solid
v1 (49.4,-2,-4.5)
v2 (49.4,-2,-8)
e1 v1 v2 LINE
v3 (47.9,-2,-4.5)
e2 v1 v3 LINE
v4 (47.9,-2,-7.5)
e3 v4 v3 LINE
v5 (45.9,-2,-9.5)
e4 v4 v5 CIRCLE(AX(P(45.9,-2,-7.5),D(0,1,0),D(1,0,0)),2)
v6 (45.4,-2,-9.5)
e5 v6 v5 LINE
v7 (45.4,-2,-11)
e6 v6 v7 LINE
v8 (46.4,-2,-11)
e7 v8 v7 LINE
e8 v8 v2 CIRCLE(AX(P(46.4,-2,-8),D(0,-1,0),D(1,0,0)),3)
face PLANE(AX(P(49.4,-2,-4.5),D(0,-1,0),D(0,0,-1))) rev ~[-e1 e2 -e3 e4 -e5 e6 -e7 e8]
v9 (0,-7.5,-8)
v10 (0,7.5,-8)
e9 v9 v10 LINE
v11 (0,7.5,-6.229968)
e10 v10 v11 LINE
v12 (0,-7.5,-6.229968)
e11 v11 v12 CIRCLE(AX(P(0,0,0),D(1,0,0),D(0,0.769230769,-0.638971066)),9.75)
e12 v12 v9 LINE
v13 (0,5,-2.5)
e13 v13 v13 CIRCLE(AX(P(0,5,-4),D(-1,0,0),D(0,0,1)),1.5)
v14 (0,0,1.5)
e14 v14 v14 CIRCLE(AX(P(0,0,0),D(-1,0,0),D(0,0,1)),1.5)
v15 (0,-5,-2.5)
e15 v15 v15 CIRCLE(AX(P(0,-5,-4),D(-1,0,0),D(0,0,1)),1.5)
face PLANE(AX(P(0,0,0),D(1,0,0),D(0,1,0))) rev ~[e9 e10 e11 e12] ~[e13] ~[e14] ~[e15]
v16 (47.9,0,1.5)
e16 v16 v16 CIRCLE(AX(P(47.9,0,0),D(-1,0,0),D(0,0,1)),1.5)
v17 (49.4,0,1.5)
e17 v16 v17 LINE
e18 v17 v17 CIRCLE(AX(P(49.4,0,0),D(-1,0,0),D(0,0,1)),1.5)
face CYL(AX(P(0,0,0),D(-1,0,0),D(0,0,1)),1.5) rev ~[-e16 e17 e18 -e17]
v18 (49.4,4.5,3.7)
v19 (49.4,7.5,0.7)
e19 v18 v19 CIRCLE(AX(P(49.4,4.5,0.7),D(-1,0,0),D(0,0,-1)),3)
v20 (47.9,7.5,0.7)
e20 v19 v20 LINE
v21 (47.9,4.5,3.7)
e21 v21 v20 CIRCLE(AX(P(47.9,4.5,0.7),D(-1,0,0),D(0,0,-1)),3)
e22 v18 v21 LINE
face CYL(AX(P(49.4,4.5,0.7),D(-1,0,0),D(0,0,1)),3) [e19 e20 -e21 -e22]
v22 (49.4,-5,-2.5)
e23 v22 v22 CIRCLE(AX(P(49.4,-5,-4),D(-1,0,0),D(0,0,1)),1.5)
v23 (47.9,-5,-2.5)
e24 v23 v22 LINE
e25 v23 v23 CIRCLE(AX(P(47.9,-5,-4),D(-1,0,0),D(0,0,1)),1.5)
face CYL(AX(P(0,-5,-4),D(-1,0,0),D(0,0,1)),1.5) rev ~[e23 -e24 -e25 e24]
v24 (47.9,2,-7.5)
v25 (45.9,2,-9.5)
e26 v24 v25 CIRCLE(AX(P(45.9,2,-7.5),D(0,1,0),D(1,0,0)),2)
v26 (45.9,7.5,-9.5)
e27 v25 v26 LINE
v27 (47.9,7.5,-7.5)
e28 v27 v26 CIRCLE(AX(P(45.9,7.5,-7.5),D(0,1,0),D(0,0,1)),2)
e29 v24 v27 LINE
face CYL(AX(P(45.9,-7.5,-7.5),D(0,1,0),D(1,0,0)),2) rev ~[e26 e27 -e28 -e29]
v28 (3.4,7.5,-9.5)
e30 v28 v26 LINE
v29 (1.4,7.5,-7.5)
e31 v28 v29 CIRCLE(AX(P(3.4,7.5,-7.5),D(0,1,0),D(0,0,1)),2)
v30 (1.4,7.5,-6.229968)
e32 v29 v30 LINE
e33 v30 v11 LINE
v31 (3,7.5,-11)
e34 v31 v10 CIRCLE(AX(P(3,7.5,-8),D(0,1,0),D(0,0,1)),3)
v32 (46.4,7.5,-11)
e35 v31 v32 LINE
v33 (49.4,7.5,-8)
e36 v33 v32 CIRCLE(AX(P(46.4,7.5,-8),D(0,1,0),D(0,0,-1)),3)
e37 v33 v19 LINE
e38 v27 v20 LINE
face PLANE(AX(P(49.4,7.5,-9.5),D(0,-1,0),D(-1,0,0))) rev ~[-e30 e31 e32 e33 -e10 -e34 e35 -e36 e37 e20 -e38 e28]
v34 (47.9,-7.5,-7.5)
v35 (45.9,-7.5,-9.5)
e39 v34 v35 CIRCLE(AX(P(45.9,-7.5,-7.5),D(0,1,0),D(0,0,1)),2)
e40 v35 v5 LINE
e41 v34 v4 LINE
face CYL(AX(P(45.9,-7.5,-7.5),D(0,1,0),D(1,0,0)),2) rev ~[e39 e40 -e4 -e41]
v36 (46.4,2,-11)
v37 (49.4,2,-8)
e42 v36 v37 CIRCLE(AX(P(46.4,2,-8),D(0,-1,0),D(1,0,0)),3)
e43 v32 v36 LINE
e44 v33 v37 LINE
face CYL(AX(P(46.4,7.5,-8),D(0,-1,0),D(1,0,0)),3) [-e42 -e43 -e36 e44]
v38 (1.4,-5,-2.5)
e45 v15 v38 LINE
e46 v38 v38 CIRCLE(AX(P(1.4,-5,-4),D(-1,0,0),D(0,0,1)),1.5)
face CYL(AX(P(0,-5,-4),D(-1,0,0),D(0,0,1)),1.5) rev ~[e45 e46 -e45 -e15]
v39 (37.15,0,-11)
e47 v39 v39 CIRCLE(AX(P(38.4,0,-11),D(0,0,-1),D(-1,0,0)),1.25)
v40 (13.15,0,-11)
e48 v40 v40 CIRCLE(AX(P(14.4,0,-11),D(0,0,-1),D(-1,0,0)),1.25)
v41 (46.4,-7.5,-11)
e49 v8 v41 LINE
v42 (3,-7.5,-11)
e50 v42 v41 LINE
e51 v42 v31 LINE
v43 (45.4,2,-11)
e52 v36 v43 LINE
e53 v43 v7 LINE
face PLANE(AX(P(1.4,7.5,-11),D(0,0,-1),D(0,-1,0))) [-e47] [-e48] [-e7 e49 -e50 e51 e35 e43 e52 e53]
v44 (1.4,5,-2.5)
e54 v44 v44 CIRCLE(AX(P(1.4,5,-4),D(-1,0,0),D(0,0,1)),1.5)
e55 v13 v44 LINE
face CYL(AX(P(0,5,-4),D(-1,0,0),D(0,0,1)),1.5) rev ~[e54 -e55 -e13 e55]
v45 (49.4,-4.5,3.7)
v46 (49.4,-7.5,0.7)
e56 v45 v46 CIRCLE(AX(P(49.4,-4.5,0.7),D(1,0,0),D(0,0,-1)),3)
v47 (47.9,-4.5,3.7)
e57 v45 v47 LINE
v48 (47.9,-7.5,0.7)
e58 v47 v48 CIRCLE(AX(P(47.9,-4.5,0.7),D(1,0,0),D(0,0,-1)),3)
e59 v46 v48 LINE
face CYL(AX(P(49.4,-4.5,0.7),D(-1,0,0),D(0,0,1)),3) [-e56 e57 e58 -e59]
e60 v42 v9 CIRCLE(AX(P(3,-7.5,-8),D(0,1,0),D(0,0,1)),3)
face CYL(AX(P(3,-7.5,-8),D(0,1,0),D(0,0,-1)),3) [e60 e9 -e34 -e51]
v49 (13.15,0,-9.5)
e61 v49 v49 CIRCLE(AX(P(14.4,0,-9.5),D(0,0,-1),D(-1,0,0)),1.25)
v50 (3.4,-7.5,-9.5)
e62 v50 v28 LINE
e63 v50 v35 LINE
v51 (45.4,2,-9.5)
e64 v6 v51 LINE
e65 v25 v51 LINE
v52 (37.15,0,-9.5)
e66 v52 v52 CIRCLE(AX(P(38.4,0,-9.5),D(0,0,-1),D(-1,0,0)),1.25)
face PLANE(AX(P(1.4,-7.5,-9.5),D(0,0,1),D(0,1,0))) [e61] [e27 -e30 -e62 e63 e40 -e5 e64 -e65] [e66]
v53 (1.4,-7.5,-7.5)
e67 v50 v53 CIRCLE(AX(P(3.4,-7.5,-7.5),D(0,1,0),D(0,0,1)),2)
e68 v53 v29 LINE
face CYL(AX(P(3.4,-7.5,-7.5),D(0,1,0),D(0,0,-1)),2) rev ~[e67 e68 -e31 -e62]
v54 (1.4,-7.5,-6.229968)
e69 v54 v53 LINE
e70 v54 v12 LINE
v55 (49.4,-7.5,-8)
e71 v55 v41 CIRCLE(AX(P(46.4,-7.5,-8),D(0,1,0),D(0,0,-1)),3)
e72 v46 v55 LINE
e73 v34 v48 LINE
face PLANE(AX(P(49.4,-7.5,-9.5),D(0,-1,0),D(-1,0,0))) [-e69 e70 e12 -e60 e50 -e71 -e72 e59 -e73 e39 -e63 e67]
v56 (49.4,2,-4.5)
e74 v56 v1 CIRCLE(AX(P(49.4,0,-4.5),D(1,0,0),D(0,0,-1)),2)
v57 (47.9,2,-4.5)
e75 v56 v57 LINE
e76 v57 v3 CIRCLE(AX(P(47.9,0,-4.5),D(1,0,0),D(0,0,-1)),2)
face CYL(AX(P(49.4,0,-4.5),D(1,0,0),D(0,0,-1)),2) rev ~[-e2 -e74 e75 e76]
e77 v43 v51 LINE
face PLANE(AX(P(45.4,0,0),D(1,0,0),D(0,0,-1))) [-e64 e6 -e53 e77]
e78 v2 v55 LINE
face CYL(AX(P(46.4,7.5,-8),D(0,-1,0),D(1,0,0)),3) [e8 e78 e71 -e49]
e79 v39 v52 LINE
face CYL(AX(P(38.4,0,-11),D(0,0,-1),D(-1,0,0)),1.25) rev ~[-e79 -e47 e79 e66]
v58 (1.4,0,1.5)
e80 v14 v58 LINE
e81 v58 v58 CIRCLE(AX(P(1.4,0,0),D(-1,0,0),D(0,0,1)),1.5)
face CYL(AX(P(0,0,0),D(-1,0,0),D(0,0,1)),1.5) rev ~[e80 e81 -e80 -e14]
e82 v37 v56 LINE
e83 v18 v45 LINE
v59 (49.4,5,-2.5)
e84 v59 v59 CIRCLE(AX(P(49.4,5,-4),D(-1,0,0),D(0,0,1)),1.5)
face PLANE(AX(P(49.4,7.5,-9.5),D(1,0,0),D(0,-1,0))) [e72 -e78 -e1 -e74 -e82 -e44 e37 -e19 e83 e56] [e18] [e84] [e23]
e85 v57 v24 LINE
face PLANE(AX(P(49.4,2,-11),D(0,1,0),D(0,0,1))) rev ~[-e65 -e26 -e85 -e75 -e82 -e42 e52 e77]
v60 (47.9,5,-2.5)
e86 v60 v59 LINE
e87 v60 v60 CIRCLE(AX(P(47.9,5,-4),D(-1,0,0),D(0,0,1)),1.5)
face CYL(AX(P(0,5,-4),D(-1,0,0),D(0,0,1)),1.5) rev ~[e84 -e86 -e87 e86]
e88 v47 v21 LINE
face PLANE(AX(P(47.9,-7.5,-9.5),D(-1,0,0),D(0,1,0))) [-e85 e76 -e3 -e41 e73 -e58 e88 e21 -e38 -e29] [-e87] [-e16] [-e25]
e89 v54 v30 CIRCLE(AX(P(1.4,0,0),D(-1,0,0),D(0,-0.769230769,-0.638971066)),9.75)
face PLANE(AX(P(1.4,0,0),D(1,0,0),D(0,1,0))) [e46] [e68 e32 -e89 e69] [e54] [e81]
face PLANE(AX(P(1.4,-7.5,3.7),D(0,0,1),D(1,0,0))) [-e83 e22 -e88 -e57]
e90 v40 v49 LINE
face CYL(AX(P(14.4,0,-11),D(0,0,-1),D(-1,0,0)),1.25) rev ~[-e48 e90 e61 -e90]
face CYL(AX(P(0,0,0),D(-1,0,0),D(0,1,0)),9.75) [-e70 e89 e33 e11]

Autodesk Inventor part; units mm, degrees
ref_plane "YZ Plane" through (0, 0, 0) normal (1, 0, 0) x (0, 1, 0)
ref_plane "XZ Plane" through (0, 0, 0) normal (0, 1, 0) x (-1, 0, 0)
ref_plane "XY Plane" through (0, 0, 0) normal (0, 0, 1) x (1, 0, 0)
sketch "スケッチ1" plane through (0, 0, 0) normal (1, 0, 0) x (0, 1, 0)
  circle A0 centre (0, 0) radius 9.75
  dimension "d0" = 19.5
extrude "押し出し1" add sketch "スケッチ1" along normal blind 1.4
sketch "スケッチ2" plane through (1.4, 0, 0) normal (1, 0, 0) x (0, 0, -1)
  circle A0 centre (0, 0) radius 9.75 projected
  line L0 (0, 0) -> (0, -7.5)
  line L1 (0, -7.5) -> (11, -7.5)
  line L2 (11, -7.5) -> (11, 7.5)
  line L3 (11, 7.5) -> (0, 7.5)
  line L4 (0, 7.5) -> (0, 0)
  point P0 (6.23, 7.5)
  point P1 (6.23, -7.5)
  dimension "d3" = 7.5
  dimension "d4" = 11
  dimension "d5" = 15
extrude "押し出し2" add sketch "スケッチ2" against normal blind 1.4 contours A0 L3 L2 L1
sketch "スケッチ4" plane through (1.4, 0, 0) normal (1, 0, 0) x (0, 0, -1)
  line L0 (11, -7.5) -> (6.23, -7.5) projected
  line L1 (6.23, 7.5) -> (11, 7.5) projected
  line L2 (11, -7.5) -> (9.5, -7.5)
  line L3 (9.5, -7.5) -> (9.5, 7.5)
  line L4 (9.5, 7.5) -> (11, 7.5)
  line L5 (11, 7.5) -> (11, -7.5)
  point P0 (0, 0)
  dimension "d13" = 1.5
extrude "押し出し4" add sketch "スケッチ4" along normal blind 48
sketch "スケッチ5" plane through (1.4, -7.5, -9.5) normal (0, 0, 1) x (1, 0, 0)
  line L0 (48, 15) -> (48, 0) projected
  line L1 (48, 15) -> (-1.4, 15) projected
  line L2 (48, 0) -> (46.5, 0)
  line L3 (46.5, 0) -> (46.5, 15)
  line L4 (46.5, 15) -> (48, 15)
  line L5 (48, 15) -> (48, 0)
  point P0 (-1.4, 7.5)
  dimension "d16" = 1.5
extrude "押し出し5" add sketch "スケッチ5" along normal blind 13.2
sketch "スケッチ6" plane through (0, 0, 0) normal (-1, 0, 0) x (0, 0, 1)
  circle A0 centre (0, 0) radius 1.5
  circle A1 centre (-4, 5) radius 1.5
  circle A2 centre (-4, -5) radius 1.5
  dimension "d19" = 3
  dimension "d20" = 3
  dimension "d21" = 3
extrude "押し出し6" cut sketch "スケッチ6" against normal blind 50
fillet "フィレット1" radius 3 2 edges at (48.65, 7.5, 3.7) (48.65, -7.5, 3.7)
fillet "フィレット2" radius 3 2 edges at (49.4, 0, -11) (0, 0, -11)
fillet "フィレット3" radius 2 2 edges at (1.4, 0, -9.5) (47.9, 0, -9.5)
sketch "スケッチ7" plane through (46.4, 7.5, -11) normal (0, 0, -1) x (-1, 0, 0)
  circle A0 centre (8, -7.5) radius 1.25
  circle A1 centre (32, -7.5) radius 1.25
  point P0 (46.4, -7.5)
  dimension "d27" = 2.5
  dimension "d28" = 2.5
extrude "押し出し7" cut sketch "スケッチ7" against normal blind 13.2
sketch "スケッチ8" plane through (49.4, 0, 0) normal (1, 0, 0) x (0, 0, -1)
  line L0 (11, 1.25) -> (11, -1.25) projected
  line L1 (11, 0) -> (11, 2)
  line L2 (11, 7.5) -> (11, -7.5) projected
  line L3 (11, 2) -> (4.5, 2)
  line L4 (4.5, 2) -> (4.5, -2)
  line L5 (4.5, -2) -> (11, -2)
  line L6 (11, -2) -> (11, 0)
  point P0 (0, 0)
  dimension "d31" = 2
  dimension "d32" = 6.5
  dimension "d33" = 4
extrude "押し出し8" cut sketch "スケッチ8" against normal blind 4
sketch "スケッチ9" plane through (49.4, 0, 0) normal (1, 0, 0) x (0, 0, -1)
  line L0 (4.5, 2) -> (4.5, -2) projected
  circle A0 centre (4.5, 0) radius 2
  point P0 (0, 0)
extrude "押し出し9" cut sketch "スケッチ9" against normal blind 4 contours L0 A0 picked at (3.8804, 0.6667)
thread "ねじ1" size "M2.5x0.45" class "6H" standard "ANSI Metric M Profile" full length
thread "ねじ2" size "M2.5x0.45" class "6H" standard "ANSI Metric M Profile" full length
properties material "アルミニウム"
